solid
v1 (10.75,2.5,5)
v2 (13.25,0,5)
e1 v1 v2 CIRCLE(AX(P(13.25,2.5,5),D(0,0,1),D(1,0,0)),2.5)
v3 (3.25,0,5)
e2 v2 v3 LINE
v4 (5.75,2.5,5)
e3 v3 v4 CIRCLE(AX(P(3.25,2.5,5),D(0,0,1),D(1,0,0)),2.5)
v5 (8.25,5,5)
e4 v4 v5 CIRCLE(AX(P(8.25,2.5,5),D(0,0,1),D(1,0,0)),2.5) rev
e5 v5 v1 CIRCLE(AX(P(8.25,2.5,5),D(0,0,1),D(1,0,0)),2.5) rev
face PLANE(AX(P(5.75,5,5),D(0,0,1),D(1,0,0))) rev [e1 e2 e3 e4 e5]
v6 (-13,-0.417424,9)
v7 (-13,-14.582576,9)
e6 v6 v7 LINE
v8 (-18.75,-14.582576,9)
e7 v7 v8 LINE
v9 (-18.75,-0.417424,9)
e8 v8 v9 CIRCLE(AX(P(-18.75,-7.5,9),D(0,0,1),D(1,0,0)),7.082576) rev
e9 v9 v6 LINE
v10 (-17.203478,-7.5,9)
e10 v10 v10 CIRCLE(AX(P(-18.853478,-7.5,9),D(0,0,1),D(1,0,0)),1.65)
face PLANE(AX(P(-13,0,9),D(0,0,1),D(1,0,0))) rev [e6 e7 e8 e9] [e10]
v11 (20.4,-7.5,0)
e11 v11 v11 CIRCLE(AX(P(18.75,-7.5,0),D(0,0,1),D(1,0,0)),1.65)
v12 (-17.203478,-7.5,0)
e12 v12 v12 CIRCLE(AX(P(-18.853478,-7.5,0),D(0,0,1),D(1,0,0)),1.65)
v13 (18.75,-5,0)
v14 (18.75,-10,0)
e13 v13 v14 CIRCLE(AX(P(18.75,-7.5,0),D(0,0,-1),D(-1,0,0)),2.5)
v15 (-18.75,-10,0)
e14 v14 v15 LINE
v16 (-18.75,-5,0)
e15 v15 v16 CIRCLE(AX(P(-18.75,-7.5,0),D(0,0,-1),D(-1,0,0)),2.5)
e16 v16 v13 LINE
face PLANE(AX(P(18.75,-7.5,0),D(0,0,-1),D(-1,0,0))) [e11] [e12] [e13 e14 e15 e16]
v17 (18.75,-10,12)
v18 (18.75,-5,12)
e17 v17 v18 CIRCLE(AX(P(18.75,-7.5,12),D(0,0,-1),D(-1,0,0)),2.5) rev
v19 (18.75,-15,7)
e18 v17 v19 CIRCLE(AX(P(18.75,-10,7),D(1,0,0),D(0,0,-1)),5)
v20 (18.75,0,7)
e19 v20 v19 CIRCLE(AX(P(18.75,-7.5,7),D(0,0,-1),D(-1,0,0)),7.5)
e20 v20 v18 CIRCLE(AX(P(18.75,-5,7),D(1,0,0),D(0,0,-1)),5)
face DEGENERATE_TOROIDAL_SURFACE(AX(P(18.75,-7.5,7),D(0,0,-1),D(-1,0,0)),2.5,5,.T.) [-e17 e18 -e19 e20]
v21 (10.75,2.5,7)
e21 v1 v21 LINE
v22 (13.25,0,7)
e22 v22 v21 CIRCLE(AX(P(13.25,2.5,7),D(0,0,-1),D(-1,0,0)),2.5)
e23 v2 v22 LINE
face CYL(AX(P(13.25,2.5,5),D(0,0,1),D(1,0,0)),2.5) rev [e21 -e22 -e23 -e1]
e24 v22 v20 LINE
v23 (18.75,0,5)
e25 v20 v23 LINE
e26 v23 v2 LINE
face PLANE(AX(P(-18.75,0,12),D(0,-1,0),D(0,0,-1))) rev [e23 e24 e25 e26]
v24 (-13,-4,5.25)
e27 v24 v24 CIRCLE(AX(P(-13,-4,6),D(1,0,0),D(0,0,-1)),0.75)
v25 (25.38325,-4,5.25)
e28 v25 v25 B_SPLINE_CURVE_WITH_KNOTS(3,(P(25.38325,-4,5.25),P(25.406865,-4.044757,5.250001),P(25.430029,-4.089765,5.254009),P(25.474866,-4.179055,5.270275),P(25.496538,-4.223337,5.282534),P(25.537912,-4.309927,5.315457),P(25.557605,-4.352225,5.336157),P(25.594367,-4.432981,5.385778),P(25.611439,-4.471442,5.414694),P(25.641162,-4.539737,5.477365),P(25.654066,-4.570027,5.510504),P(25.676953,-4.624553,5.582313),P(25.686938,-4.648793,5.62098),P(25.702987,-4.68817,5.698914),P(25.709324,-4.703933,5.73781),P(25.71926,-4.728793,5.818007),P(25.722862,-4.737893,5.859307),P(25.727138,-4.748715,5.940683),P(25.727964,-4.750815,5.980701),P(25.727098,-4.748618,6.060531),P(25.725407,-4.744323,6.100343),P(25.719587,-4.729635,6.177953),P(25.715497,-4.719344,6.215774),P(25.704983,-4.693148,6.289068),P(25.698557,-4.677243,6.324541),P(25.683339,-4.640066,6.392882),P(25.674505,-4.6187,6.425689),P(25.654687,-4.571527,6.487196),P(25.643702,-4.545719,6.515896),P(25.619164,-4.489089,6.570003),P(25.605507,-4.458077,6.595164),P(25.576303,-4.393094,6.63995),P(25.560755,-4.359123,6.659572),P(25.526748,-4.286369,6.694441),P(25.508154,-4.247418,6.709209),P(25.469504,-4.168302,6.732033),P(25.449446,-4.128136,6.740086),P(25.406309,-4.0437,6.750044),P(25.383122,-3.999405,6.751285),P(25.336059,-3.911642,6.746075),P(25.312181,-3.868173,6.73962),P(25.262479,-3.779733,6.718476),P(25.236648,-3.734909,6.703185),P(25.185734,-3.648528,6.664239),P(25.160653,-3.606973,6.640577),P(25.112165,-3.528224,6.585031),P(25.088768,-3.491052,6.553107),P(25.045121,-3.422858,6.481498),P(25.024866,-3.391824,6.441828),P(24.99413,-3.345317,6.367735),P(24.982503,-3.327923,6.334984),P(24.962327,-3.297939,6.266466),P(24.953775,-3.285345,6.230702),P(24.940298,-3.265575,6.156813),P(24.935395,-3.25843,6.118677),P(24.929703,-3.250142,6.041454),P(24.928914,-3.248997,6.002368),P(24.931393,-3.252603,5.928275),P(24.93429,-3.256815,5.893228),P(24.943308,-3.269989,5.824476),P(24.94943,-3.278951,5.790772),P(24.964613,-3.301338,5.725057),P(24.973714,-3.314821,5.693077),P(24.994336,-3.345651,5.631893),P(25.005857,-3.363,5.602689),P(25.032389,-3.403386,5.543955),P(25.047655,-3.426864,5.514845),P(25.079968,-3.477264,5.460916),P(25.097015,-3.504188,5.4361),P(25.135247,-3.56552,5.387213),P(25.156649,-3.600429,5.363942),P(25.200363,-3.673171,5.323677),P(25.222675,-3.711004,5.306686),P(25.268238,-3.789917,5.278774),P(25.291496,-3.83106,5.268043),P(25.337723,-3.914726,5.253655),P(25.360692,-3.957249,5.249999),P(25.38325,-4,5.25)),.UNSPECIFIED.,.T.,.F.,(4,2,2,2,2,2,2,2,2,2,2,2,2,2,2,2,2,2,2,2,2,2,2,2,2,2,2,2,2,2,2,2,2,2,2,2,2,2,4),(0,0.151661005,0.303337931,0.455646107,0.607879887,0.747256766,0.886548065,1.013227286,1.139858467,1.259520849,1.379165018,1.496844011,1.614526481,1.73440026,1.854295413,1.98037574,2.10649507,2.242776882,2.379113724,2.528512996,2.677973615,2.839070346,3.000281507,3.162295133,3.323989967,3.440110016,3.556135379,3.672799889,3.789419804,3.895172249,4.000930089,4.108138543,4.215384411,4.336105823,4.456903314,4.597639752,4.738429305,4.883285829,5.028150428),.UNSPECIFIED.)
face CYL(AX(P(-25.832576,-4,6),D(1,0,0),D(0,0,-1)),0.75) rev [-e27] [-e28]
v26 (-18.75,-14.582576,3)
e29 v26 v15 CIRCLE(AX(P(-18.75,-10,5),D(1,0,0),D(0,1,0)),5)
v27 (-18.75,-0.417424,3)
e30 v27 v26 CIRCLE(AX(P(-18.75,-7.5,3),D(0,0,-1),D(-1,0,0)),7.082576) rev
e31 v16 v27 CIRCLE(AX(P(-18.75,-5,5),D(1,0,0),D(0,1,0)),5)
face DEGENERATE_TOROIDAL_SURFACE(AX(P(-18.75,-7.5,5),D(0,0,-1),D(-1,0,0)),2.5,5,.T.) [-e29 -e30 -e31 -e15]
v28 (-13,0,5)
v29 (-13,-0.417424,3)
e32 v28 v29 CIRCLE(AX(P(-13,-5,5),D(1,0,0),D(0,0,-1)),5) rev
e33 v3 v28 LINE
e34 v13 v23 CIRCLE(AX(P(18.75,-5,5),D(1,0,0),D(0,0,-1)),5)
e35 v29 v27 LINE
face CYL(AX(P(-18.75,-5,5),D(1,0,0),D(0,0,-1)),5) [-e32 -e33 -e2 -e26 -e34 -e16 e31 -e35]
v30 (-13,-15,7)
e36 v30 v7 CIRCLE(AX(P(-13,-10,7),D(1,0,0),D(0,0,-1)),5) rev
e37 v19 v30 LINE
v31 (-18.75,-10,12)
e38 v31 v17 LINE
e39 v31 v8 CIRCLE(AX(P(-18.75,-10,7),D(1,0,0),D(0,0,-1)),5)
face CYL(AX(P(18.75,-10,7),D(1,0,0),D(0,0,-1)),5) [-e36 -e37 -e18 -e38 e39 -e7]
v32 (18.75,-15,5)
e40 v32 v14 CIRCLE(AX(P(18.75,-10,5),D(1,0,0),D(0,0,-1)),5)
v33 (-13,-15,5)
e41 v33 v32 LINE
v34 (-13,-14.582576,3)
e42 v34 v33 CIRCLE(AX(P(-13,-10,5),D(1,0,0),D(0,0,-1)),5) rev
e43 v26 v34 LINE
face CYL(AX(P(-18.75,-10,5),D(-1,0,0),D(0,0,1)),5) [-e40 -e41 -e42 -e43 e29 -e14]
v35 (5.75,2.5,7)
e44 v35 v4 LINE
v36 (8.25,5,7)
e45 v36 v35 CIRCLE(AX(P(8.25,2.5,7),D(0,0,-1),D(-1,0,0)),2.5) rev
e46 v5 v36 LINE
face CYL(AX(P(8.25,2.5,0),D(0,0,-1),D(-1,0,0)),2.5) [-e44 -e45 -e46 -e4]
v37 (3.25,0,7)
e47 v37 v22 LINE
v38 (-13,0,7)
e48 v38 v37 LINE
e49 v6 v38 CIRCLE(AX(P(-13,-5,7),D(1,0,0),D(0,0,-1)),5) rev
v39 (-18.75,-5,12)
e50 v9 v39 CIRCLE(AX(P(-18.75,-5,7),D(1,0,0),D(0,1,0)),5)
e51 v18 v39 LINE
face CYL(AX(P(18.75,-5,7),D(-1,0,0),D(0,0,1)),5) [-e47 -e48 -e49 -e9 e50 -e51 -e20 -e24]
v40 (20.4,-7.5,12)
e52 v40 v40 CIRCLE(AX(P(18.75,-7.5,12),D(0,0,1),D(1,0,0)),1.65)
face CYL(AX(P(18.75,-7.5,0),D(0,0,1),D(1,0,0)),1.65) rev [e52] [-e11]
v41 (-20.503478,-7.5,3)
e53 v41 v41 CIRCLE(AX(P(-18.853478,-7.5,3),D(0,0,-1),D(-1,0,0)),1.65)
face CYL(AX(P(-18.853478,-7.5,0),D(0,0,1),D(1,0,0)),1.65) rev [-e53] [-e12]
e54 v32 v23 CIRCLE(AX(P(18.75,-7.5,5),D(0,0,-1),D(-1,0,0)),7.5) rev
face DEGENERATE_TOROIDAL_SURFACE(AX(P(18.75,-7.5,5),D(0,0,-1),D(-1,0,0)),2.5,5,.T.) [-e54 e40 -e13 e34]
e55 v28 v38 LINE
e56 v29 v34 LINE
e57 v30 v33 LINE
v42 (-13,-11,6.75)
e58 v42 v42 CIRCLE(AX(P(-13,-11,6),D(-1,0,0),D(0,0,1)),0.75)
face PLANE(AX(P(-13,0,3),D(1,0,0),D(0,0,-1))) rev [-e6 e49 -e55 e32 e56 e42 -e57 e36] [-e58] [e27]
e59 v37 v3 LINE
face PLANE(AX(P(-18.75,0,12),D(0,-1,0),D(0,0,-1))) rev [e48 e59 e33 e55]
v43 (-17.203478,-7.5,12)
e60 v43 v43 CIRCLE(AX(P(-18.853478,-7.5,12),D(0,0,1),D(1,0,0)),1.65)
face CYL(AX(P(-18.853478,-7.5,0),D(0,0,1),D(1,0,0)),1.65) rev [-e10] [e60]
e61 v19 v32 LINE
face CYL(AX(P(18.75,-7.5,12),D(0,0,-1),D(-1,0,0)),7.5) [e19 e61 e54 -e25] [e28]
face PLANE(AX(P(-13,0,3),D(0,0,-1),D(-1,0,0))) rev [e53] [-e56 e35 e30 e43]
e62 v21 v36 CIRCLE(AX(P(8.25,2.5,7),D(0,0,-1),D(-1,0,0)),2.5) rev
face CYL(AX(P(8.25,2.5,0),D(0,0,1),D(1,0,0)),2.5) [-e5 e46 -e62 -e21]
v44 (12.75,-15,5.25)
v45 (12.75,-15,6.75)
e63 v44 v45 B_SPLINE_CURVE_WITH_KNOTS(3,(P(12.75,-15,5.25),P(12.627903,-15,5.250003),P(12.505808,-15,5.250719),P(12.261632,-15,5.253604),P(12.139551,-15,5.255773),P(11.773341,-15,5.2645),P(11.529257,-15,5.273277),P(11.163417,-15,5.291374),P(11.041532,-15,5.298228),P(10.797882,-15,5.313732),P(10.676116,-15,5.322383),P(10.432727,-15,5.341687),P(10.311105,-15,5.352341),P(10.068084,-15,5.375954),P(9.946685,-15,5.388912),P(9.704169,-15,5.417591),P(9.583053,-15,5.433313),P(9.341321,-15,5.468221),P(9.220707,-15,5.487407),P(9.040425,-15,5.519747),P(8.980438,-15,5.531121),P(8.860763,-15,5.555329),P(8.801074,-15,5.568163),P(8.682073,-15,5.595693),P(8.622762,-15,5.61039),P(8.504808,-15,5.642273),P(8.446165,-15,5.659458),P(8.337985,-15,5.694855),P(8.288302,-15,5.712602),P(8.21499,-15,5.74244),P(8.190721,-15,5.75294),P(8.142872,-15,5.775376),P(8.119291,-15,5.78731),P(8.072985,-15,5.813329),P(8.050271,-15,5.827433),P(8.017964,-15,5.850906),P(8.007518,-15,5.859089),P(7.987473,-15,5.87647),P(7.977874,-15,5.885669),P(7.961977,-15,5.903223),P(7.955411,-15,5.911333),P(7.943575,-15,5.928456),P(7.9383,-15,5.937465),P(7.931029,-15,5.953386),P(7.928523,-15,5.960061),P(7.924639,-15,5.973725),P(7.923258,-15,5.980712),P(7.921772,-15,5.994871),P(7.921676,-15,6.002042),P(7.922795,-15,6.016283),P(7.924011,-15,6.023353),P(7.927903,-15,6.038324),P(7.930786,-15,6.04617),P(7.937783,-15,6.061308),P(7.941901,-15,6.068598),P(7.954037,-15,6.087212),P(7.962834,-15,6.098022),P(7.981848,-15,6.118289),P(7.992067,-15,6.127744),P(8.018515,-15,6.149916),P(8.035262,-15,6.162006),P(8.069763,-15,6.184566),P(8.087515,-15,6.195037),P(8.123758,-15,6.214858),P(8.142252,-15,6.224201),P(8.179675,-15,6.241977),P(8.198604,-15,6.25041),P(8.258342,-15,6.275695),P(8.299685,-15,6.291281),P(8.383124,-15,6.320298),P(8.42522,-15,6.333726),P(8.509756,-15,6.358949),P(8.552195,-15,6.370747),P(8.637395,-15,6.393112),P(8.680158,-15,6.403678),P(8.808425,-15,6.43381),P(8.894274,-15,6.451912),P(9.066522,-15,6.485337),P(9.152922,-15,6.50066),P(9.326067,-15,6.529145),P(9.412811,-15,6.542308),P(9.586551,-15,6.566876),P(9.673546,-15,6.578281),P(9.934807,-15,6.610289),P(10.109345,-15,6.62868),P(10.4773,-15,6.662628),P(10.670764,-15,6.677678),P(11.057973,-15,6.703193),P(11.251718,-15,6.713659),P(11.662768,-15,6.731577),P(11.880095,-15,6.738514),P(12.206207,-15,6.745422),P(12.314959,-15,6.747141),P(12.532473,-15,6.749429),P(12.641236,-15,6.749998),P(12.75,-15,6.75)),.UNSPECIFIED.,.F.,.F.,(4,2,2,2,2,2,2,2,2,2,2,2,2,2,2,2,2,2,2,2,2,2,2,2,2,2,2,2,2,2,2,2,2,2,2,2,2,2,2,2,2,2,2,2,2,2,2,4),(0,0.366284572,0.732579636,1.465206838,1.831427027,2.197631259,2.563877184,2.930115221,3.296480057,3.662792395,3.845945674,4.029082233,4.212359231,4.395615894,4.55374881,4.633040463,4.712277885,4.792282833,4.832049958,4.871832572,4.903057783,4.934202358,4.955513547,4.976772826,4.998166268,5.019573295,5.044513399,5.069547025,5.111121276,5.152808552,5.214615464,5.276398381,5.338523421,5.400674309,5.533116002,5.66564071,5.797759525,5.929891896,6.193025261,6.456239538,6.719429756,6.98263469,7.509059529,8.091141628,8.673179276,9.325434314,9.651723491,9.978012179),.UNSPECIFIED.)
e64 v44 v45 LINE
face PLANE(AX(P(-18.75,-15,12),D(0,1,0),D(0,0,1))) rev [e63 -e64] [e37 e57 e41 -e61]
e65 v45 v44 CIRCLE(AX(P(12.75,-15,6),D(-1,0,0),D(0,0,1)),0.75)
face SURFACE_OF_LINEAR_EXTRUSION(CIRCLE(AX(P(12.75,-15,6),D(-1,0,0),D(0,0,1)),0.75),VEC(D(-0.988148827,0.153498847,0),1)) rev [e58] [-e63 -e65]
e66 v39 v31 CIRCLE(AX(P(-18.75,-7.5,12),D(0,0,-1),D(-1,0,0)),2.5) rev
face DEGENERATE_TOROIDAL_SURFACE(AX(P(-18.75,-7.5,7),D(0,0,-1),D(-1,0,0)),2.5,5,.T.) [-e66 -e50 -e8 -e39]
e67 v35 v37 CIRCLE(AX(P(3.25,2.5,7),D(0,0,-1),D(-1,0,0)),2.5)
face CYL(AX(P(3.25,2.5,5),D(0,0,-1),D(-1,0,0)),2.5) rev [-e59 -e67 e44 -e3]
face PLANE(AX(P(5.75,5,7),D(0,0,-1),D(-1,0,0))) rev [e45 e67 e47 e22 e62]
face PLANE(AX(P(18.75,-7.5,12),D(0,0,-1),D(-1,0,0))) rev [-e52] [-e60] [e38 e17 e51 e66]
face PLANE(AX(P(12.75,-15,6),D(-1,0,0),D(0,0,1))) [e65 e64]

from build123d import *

# Parameters (mm, degrees)
BOSS_EXTRUDE1_DEPTH = 12
FILLET1_R           = 5
SKETCH5_W           = 13.25
SKETCH5_H           = 6
CUT_EXTRUDE3_DEPTH  = 39.184584586
SKETCH6_W           = 5
SKETCH6_H           = 2
BOSS_EXTRUDE2_DEPTH = 5
FILLET2_R           = 2.5
FILLET3_R           = 2.5
SKETCH3_R           = 1.65
CUT_EXTRUDE4_DEPTH  = 33.5278727
SKETCH8_R           = 0.75
CUT_EXTRUDE7_DEPTH  = 56.512113127
SKETCH9_R           = 0.75
CUT_EXTRUDE9_DEPTH  = 26.058827679


with BuildPart() as part:
    # Sketch2 → Boss-Extrude1 (new body)
    with BuildSketch(Plane.XY):
        with BuildLine():
            Line((-18.75, 0), (18.75, 0))
            ThreePointArc((18.75, 0), (26.25, -7.5), (18.75, -15))
            Line((18.75, -15), (-18.75, -15))
            ThreePointArc((-18.75, -15), (-26.25, -7.5), (-18.75, 0))
        make_face()
    extrude(amount=BOSS_EXTRUDE1_DEPTH)

    # Fillet1
    fillet1_edges = [part.edges().sort_by_distance(p)[0] for p in [
        (-26.25, -7.5, 12),
        (0, -15, 12),
        (26.25, -7.5, 12),
        (0, -15, 0),
        (-26.25, -7.5, 0),
        (0, 0, 0),
        (26.25, -7.5, 0),
        (0, 0, 12),
    ]]
    fillet(fillet1_edges, radius=FILLET1_R)

    # Sketch5 → Cut-Extrude3 (cut, through all)
    with BuildSketch(Plane(origin=(0, -25, 0), x_dir=(-1, 0, 0), z_dir=(0, -1, 0))):
        with Locations((19.625, -6)):
            Rectangle(SKETCH5_W, SKETCH5_H)
    extrude(amount=-CUT_EXTRUDE3_DEPTH, mode=Mode.SUBTRACT)

    # Sketch6 → Boss-Extrude2 (add)
    with BuildSketch(Plane(origin=(0, 0, 0), x_dir=(1, 0, 0), z_dir=(0, 1, 0))):
        with Locations((8.25, -6)):
            Rectangle(SKETCH6_W, SKETCH6_H)
    extrude(amount=BOSS_EXTRUDE2_DEPTH)

    # Fillet2
    fillet2_edges = [part.edges().sort_by_distance(p)[0] for p in [
        (10.75, 5, 6),
        (5.75, 5, 6),
    ]]
    fillet(fillet2_edges, radius=FILLET2_R - 0.0001)  # a hair under: the kernel refuses the full size

    # Fillet3
    fillet3_edges = [part.edges().sort_by_distance(p)[0] for p in [
        (5.75, 0, 6),
        (10.75, 0, 6),
    ]]
    fillet(fillet3_edges, radius=FILLET3_R)

    # Sketch3 → Cut-Extrude4 (cut, through all)
    with BuildSketch(Plane.XY.offset(12)):
        with Locations((-18.853477977, -7.5)):
            Circle(SKETCH3_R)
        with Locations((18.75, -7.5)):
            Circle(SKETCH3_R)
    extrude(amount=-CUT_EXTRUDE4_DEPTH, mode=Mode.SUBTRACT)

    # Sketch8 → Cut-Extrude7 (cut, through all)
    with BuildSketch(Plane(origin=(26.25, 0, 0), x_dir=(0, 0, -1), z_dir=(1, 0, 0))):
        with Locations((-6, -4)):
            Circle(SKETCH8_R)
    extrude(amount=-CUT_EXTRUDE7_DEPTH, mode=Mode.SUBTRACT)

    # Sketch9 → Cut-Extrude9 (cut, along a direction that is not the sketch's normal)
    with BuildSketch(Plane.ZY.offset(13)):
        with Locations((6, -11)):
            Circle(SKETCH9_R)
    extrude(amount=-CUT_EXTRUDE9_DEPTH, dir=(-0.988148826849317, 0.15349884688921422, 0), mode=Mode.SUBTRACT)


solid = part.part
